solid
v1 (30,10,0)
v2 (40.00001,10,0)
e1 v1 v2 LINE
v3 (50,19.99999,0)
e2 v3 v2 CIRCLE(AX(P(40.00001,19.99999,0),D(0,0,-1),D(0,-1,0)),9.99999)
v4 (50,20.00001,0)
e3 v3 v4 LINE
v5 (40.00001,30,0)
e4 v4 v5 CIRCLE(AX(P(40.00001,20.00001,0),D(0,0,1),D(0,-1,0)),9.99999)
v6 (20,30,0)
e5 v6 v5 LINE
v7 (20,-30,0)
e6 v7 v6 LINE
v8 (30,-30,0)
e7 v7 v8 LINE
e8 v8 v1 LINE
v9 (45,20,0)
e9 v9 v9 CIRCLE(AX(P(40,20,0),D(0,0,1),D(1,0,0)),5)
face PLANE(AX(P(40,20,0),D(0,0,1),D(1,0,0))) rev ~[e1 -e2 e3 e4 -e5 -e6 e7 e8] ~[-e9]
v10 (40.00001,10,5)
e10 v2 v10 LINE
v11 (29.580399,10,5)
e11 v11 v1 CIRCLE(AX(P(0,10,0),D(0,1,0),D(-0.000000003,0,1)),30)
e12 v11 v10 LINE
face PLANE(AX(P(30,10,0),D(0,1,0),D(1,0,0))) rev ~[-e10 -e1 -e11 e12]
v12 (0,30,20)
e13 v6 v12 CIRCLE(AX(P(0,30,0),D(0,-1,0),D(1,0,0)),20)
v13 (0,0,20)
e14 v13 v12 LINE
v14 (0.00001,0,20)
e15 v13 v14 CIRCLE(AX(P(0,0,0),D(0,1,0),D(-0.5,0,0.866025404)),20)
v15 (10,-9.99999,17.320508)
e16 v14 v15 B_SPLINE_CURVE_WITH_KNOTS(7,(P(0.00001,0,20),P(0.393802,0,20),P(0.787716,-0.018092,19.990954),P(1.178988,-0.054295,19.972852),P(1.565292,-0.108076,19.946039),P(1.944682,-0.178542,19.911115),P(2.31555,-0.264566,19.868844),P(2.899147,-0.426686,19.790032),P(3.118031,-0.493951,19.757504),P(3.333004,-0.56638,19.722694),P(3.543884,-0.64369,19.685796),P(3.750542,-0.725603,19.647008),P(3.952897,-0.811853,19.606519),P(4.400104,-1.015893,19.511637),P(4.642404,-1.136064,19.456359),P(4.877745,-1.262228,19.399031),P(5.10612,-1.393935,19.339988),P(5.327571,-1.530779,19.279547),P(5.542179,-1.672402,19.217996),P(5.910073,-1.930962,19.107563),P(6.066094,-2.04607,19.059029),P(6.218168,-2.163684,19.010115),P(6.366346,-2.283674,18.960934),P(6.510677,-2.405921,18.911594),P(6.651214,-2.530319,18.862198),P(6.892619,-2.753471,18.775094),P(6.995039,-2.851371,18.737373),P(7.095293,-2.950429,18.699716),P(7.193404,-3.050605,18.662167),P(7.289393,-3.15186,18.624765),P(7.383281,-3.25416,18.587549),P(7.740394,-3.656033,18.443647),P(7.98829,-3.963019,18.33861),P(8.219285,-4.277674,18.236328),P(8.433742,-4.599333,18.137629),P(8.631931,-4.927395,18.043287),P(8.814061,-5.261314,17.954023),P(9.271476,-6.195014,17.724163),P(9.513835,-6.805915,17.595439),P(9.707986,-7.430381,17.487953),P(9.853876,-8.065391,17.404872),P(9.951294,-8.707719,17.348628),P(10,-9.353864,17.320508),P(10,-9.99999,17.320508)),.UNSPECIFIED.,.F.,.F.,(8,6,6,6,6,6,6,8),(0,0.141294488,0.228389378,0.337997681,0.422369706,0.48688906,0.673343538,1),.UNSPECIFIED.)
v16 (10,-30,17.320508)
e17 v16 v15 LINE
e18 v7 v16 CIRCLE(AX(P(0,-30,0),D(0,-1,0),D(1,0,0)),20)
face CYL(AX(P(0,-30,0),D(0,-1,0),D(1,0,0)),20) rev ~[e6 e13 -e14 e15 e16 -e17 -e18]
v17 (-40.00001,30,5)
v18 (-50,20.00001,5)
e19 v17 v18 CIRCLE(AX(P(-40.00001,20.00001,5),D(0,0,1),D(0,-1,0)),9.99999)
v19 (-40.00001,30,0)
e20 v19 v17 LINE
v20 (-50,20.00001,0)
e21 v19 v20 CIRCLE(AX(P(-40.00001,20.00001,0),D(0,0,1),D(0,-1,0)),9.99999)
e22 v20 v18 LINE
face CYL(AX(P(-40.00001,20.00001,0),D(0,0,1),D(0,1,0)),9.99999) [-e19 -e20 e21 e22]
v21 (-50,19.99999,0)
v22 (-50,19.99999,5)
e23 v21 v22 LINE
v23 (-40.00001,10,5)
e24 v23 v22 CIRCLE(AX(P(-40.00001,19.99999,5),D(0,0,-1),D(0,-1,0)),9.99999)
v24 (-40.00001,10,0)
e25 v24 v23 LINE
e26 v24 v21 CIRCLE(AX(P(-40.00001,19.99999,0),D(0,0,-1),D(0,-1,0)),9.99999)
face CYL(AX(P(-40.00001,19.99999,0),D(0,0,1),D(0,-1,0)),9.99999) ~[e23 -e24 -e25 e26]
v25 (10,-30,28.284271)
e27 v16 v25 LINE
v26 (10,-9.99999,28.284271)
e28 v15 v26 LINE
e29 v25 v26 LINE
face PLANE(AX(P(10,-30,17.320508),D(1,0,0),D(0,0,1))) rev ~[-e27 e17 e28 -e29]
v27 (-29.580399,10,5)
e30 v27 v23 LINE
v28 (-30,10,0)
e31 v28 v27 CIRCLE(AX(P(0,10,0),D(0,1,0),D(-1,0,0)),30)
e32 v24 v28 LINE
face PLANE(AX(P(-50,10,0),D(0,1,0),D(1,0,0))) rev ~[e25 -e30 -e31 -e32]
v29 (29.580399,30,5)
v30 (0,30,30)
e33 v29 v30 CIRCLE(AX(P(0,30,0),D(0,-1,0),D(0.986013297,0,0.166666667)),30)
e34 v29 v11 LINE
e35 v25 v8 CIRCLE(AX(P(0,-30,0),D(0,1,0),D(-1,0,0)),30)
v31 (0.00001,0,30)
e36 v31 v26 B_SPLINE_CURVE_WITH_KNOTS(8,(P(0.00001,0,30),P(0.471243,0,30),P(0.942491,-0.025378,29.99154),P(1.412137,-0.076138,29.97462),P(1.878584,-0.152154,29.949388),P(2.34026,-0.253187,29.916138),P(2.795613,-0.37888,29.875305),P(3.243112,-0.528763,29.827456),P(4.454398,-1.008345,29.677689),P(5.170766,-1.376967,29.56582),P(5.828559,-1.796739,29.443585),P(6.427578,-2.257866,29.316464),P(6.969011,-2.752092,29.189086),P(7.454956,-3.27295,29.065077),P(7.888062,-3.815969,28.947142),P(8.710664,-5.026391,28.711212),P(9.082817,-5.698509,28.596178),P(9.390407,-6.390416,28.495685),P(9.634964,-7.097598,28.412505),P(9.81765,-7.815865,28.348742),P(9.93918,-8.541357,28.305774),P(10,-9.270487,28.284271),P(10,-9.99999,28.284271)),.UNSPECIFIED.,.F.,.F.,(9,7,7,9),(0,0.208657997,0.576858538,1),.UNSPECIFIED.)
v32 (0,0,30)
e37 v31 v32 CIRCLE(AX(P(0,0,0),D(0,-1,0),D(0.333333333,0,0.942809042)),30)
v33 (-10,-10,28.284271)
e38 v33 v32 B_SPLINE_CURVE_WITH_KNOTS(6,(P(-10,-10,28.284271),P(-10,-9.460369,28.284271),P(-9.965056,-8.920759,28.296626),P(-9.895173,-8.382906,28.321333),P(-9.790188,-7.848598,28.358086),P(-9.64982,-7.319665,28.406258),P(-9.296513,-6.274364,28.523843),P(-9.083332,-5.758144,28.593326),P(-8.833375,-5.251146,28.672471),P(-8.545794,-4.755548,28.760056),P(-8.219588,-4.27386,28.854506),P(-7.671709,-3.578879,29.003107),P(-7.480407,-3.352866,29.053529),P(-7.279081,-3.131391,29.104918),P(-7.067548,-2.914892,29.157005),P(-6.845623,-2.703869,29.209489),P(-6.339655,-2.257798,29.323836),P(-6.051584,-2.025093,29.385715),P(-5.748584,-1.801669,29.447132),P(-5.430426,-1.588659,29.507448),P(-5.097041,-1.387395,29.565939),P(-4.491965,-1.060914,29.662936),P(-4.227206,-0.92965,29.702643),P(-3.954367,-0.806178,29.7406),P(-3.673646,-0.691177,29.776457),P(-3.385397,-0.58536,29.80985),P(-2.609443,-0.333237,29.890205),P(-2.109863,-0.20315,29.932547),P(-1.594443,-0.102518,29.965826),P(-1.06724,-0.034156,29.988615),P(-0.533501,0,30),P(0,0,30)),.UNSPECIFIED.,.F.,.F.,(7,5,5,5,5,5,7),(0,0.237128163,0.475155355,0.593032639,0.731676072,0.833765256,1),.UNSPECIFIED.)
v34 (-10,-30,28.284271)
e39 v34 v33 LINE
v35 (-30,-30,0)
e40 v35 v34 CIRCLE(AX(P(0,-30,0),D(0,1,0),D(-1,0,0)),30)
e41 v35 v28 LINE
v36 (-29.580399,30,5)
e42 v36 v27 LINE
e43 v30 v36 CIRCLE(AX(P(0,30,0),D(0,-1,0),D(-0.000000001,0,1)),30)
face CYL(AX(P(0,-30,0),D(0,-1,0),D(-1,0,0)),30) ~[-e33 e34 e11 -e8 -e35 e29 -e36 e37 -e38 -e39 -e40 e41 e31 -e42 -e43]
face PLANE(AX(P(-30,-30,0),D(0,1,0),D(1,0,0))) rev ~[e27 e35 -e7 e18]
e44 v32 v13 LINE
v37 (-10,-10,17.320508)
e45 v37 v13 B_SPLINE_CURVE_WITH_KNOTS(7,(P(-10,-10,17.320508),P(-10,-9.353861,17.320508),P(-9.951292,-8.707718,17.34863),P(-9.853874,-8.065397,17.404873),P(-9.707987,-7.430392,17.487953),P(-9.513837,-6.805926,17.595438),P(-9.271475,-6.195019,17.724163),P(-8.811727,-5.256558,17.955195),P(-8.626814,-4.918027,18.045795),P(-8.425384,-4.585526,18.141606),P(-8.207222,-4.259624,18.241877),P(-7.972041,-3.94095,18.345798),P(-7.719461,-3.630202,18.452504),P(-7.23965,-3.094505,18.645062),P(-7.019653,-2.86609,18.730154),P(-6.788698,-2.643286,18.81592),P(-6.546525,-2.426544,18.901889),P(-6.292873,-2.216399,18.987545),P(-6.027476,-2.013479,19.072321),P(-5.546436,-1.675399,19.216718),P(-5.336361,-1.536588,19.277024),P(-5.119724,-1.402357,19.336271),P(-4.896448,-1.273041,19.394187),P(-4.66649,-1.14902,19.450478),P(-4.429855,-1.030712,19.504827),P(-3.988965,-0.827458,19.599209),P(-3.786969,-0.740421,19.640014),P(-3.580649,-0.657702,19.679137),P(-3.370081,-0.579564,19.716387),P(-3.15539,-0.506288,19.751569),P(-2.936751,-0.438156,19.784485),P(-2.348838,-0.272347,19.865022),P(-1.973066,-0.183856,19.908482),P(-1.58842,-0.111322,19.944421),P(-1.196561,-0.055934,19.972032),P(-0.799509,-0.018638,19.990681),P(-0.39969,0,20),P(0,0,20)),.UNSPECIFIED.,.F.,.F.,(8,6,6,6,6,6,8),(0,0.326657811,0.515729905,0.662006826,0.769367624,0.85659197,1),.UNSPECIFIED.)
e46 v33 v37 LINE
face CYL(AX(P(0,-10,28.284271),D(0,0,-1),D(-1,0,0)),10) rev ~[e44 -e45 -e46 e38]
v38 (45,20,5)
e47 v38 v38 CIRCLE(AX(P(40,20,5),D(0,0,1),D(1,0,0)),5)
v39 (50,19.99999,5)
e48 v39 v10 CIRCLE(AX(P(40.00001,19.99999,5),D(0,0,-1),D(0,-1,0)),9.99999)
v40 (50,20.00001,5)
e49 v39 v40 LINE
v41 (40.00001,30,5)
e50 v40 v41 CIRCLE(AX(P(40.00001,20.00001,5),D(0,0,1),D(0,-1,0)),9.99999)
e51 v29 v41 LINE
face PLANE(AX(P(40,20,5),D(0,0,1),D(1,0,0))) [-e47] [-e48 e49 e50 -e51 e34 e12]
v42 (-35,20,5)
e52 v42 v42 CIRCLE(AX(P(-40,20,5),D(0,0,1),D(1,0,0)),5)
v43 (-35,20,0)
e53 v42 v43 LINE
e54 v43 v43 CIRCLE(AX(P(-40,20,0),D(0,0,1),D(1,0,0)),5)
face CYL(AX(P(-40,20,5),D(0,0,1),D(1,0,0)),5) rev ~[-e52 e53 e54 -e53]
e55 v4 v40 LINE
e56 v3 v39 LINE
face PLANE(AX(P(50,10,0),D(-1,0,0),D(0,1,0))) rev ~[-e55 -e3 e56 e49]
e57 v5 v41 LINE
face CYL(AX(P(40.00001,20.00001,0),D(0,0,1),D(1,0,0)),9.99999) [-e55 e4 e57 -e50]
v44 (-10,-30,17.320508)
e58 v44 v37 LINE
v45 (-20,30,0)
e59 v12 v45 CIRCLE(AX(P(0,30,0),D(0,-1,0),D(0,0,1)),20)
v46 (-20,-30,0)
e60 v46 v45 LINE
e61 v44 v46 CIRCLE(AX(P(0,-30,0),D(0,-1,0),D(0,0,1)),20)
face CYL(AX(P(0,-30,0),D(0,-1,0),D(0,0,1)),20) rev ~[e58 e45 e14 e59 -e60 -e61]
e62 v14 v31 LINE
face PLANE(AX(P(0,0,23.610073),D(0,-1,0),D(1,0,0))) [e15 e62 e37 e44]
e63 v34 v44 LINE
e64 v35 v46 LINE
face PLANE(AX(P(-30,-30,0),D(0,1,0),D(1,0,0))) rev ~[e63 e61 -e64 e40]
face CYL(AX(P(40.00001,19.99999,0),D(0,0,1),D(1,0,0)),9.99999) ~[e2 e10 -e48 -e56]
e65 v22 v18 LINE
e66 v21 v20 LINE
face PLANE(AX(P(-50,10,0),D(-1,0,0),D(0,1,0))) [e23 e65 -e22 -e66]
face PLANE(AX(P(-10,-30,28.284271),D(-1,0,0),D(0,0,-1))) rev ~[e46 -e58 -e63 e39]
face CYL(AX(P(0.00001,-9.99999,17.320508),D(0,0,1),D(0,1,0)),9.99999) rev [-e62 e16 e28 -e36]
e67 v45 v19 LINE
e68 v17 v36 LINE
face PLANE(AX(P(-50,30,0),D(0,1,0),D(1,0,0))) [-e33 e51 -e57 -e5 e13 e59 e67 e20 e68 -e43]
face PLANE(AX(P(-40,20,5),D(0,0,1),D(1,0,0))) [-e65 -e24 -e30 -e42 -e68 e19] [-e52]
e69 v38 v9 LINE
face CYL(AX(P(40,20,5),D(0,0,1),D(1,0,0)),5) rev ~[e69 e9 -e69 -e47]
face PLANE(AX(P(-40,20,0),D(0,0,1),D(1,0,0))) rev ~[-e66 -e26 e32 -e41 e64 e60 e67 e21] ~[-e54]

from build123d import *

# Parameters (mm, degrees)
F1_W      = 60
F1_H      = 60
F2_DEPTH  = 30
F4_DEPTH  = 60.001
F5_W      = 20
F5_H      = 20
F6_DEPTH  = 5
F7_W      = 20
F7_H      = 20
F8_DEPTH  = 5
F10_DEPTH = 20
F12_DEPTH = 40
F13_R     = 9.99999
F14_R     = 9.99999
F15_R     = 5
F16_DEPTH = 5.001
F17_R     = 5
F18_DEPTH = 5.001
F20_DEPTH = 30
F21_R     = 10
F22_R     = 9.99999


# Not quite as in the source:
# - a fillet or chamfer is up to 0.001 mm smaller than in the source, because OpenCascade refuses the exact size


with BuildPart() as f2:
    # F1 (on Top) → F2 (new body)
    with BuildSketch(Plane.XY):
        Rectangle(F1_W, F1_H)
    extrude(amount=F2_DEPTH)

    # F3 (on face) → F4 (cut, through all)
    with BuildSketch(Plane.XZ.offset(30)):
        with BuildLine():
            ThreePointArc((20, 0), (14.1421356237, 14.1421356237), (0, 20))
            Line((0, 20), (0, 0))
            Line((0, 0), (20, 0))
        make_face()
        with BuildLine():
            Line((0, 0), (0, 20))
            ThreePointArc((0, 20), (-14.1421356237, 14.1421356237), (-20, 0))
            Line((-20, 0), (0, 0))
        make_face()
    extrude(amount=-F4_DEPTH, mode=Mode.SUBTRACT)

    # F5 (on Top) → F6 (join)
    with BuildSketch(Plane.XY):
        with Locations((40, 20)):
            Rectangle(F5_W, F5_H)
    extrude(amount=F6_DEPTH)

    # F7 (on Top) → F8 (join)
    with BuildSketch(Plane.XY):
        with Locations((-40, 20)):
            Rectangle(F7_W, F7_H)
    extrude(amount=F8_DEPTH)

    # F9 (on face) → F10 (cut)
    with BuildSketch(Plane(origin=(0, 30, 0), x_dir=(-1, 0, 0), z_dir=(0, 1, 0))):
        with BuildLine():
            ThreePointArc((-29.5803989155, 5), (-19.3649167147, 22.9128784886), (4.28e-08, 30))
            Line((4.28e-08, 30), (-30, 30))
            Line((-30, 30), (-30, 5))
            Line((-30, 5), (-29.5803989155, 5))
        make_face()
        with BuildLine():
            ThreePointArc((4.28e-08, 30), (19.3649167474, 22.912878461), (29.5803989155, 5))
            Line((29.5803989155, 5), (30, 5))
            Line((30, 5), (30, 30))
            Line((30, 30), (4.28e-08, 30))
        make_face()
    extrude(amount=-F10_DEPTH, mode=Mode.SUBTRACT)

    # F11 (on face) → F12 (cut)
    with BuildSketch(Plane.XZ.offset(30)):
        with BuildLine():
            Line((-30, 30), (-30, 0))
            ThreePointArc((-30, 0), (-21.2132034683, 21.2132034029), (-9.24e-08, 30))
            Line((-9.24e-08, 30), (-30, 30))
        make_face()
        with BuildLine():
            ThreePointArc((-9.24e-08, 30), (21.2132034029, 21.2132034683), (30, 0))
            Line((30, 0), (30, 30))
            Line((30, 30), (-9.24e-08, 30))
        make_face()
    extrude(amount=-F12_DEPTH, mode=Mode.SUBTRACT)

    # F13 (radius 10 in the source; OpenCascade refuses exactly that, so slightly less here)
    f13_edges = [f2.edges().sort_by_distance(p)[0] for p in [
        (50, 30, 2.5),
        (50, 10, 2.5),
    ]]
    fillet(f13_edges, radius=F13_R)

    # F14 (radius 10 in the source; OpenCascade refuses exactly that, so slightly less here)
    f14_edges = [f2.edges().sort_by_distance(p)[0] for p in [
        (-50, 30, 2.5),
        (-50, 10, 2.5),
    ]]
    fillet(f14_edges, radius=F14_R)

    # F15 (on face) → F16 (cut, through all)
    with BuildSketch(Plane.XY.offset(5)):
        with Locations((-40, 20)):
            Circle(F15_R)
    extrude(amount=-F16_DEPTH, mode=Mode.SUBTRACT)

    # F17 (on face) → F18 (cut, through all)
    with BuildSketch(Plane.XY.offset(5)):
        with Locations((40, 20)):
            Circle(F17_R)
    extrude(amount=-F18_DEPTH, mode=Mode.SUBTRACT)

    # F19 (on face) → F20 (cut)
    with BuildSketch(Plane.XZ.offset(30)):
        with BuildLine():
            Line((10, 17.3205080757), (10, 28.2842712437))
            ThreePointArc((10.0000000012, 28.284271247), (1.3e-09, 30), (-9.9999999988, 28.2842712479))
            Line((-10, 28.2842712513), (-10, 17.3205080757))
            ThreePointArc((-10, 17.3205080757), (0, 20), (10, 17.3205080757))
        make_face()
    extrude(amount=-F20_DEPTH, mode=Mode.SUBTRACT)

    # F21
    f21_edges = [f2.edges().sort_by_distance(p)[0] for p in [
        (-10, 0, 22.80239),
    ]]
    fillet(f21_edges, radius=F21_R)

    # F22 (radius 10 in the source; OpenCascade refuses exactly that, so slightly less here)
    f22_edges = [f2.edges().sort_by_distance(p)[0] for p in [
        (10, 0, 22.80239),
    ]]
    fillet(f22_edges, radius=F22_R)


solid = f2.part
